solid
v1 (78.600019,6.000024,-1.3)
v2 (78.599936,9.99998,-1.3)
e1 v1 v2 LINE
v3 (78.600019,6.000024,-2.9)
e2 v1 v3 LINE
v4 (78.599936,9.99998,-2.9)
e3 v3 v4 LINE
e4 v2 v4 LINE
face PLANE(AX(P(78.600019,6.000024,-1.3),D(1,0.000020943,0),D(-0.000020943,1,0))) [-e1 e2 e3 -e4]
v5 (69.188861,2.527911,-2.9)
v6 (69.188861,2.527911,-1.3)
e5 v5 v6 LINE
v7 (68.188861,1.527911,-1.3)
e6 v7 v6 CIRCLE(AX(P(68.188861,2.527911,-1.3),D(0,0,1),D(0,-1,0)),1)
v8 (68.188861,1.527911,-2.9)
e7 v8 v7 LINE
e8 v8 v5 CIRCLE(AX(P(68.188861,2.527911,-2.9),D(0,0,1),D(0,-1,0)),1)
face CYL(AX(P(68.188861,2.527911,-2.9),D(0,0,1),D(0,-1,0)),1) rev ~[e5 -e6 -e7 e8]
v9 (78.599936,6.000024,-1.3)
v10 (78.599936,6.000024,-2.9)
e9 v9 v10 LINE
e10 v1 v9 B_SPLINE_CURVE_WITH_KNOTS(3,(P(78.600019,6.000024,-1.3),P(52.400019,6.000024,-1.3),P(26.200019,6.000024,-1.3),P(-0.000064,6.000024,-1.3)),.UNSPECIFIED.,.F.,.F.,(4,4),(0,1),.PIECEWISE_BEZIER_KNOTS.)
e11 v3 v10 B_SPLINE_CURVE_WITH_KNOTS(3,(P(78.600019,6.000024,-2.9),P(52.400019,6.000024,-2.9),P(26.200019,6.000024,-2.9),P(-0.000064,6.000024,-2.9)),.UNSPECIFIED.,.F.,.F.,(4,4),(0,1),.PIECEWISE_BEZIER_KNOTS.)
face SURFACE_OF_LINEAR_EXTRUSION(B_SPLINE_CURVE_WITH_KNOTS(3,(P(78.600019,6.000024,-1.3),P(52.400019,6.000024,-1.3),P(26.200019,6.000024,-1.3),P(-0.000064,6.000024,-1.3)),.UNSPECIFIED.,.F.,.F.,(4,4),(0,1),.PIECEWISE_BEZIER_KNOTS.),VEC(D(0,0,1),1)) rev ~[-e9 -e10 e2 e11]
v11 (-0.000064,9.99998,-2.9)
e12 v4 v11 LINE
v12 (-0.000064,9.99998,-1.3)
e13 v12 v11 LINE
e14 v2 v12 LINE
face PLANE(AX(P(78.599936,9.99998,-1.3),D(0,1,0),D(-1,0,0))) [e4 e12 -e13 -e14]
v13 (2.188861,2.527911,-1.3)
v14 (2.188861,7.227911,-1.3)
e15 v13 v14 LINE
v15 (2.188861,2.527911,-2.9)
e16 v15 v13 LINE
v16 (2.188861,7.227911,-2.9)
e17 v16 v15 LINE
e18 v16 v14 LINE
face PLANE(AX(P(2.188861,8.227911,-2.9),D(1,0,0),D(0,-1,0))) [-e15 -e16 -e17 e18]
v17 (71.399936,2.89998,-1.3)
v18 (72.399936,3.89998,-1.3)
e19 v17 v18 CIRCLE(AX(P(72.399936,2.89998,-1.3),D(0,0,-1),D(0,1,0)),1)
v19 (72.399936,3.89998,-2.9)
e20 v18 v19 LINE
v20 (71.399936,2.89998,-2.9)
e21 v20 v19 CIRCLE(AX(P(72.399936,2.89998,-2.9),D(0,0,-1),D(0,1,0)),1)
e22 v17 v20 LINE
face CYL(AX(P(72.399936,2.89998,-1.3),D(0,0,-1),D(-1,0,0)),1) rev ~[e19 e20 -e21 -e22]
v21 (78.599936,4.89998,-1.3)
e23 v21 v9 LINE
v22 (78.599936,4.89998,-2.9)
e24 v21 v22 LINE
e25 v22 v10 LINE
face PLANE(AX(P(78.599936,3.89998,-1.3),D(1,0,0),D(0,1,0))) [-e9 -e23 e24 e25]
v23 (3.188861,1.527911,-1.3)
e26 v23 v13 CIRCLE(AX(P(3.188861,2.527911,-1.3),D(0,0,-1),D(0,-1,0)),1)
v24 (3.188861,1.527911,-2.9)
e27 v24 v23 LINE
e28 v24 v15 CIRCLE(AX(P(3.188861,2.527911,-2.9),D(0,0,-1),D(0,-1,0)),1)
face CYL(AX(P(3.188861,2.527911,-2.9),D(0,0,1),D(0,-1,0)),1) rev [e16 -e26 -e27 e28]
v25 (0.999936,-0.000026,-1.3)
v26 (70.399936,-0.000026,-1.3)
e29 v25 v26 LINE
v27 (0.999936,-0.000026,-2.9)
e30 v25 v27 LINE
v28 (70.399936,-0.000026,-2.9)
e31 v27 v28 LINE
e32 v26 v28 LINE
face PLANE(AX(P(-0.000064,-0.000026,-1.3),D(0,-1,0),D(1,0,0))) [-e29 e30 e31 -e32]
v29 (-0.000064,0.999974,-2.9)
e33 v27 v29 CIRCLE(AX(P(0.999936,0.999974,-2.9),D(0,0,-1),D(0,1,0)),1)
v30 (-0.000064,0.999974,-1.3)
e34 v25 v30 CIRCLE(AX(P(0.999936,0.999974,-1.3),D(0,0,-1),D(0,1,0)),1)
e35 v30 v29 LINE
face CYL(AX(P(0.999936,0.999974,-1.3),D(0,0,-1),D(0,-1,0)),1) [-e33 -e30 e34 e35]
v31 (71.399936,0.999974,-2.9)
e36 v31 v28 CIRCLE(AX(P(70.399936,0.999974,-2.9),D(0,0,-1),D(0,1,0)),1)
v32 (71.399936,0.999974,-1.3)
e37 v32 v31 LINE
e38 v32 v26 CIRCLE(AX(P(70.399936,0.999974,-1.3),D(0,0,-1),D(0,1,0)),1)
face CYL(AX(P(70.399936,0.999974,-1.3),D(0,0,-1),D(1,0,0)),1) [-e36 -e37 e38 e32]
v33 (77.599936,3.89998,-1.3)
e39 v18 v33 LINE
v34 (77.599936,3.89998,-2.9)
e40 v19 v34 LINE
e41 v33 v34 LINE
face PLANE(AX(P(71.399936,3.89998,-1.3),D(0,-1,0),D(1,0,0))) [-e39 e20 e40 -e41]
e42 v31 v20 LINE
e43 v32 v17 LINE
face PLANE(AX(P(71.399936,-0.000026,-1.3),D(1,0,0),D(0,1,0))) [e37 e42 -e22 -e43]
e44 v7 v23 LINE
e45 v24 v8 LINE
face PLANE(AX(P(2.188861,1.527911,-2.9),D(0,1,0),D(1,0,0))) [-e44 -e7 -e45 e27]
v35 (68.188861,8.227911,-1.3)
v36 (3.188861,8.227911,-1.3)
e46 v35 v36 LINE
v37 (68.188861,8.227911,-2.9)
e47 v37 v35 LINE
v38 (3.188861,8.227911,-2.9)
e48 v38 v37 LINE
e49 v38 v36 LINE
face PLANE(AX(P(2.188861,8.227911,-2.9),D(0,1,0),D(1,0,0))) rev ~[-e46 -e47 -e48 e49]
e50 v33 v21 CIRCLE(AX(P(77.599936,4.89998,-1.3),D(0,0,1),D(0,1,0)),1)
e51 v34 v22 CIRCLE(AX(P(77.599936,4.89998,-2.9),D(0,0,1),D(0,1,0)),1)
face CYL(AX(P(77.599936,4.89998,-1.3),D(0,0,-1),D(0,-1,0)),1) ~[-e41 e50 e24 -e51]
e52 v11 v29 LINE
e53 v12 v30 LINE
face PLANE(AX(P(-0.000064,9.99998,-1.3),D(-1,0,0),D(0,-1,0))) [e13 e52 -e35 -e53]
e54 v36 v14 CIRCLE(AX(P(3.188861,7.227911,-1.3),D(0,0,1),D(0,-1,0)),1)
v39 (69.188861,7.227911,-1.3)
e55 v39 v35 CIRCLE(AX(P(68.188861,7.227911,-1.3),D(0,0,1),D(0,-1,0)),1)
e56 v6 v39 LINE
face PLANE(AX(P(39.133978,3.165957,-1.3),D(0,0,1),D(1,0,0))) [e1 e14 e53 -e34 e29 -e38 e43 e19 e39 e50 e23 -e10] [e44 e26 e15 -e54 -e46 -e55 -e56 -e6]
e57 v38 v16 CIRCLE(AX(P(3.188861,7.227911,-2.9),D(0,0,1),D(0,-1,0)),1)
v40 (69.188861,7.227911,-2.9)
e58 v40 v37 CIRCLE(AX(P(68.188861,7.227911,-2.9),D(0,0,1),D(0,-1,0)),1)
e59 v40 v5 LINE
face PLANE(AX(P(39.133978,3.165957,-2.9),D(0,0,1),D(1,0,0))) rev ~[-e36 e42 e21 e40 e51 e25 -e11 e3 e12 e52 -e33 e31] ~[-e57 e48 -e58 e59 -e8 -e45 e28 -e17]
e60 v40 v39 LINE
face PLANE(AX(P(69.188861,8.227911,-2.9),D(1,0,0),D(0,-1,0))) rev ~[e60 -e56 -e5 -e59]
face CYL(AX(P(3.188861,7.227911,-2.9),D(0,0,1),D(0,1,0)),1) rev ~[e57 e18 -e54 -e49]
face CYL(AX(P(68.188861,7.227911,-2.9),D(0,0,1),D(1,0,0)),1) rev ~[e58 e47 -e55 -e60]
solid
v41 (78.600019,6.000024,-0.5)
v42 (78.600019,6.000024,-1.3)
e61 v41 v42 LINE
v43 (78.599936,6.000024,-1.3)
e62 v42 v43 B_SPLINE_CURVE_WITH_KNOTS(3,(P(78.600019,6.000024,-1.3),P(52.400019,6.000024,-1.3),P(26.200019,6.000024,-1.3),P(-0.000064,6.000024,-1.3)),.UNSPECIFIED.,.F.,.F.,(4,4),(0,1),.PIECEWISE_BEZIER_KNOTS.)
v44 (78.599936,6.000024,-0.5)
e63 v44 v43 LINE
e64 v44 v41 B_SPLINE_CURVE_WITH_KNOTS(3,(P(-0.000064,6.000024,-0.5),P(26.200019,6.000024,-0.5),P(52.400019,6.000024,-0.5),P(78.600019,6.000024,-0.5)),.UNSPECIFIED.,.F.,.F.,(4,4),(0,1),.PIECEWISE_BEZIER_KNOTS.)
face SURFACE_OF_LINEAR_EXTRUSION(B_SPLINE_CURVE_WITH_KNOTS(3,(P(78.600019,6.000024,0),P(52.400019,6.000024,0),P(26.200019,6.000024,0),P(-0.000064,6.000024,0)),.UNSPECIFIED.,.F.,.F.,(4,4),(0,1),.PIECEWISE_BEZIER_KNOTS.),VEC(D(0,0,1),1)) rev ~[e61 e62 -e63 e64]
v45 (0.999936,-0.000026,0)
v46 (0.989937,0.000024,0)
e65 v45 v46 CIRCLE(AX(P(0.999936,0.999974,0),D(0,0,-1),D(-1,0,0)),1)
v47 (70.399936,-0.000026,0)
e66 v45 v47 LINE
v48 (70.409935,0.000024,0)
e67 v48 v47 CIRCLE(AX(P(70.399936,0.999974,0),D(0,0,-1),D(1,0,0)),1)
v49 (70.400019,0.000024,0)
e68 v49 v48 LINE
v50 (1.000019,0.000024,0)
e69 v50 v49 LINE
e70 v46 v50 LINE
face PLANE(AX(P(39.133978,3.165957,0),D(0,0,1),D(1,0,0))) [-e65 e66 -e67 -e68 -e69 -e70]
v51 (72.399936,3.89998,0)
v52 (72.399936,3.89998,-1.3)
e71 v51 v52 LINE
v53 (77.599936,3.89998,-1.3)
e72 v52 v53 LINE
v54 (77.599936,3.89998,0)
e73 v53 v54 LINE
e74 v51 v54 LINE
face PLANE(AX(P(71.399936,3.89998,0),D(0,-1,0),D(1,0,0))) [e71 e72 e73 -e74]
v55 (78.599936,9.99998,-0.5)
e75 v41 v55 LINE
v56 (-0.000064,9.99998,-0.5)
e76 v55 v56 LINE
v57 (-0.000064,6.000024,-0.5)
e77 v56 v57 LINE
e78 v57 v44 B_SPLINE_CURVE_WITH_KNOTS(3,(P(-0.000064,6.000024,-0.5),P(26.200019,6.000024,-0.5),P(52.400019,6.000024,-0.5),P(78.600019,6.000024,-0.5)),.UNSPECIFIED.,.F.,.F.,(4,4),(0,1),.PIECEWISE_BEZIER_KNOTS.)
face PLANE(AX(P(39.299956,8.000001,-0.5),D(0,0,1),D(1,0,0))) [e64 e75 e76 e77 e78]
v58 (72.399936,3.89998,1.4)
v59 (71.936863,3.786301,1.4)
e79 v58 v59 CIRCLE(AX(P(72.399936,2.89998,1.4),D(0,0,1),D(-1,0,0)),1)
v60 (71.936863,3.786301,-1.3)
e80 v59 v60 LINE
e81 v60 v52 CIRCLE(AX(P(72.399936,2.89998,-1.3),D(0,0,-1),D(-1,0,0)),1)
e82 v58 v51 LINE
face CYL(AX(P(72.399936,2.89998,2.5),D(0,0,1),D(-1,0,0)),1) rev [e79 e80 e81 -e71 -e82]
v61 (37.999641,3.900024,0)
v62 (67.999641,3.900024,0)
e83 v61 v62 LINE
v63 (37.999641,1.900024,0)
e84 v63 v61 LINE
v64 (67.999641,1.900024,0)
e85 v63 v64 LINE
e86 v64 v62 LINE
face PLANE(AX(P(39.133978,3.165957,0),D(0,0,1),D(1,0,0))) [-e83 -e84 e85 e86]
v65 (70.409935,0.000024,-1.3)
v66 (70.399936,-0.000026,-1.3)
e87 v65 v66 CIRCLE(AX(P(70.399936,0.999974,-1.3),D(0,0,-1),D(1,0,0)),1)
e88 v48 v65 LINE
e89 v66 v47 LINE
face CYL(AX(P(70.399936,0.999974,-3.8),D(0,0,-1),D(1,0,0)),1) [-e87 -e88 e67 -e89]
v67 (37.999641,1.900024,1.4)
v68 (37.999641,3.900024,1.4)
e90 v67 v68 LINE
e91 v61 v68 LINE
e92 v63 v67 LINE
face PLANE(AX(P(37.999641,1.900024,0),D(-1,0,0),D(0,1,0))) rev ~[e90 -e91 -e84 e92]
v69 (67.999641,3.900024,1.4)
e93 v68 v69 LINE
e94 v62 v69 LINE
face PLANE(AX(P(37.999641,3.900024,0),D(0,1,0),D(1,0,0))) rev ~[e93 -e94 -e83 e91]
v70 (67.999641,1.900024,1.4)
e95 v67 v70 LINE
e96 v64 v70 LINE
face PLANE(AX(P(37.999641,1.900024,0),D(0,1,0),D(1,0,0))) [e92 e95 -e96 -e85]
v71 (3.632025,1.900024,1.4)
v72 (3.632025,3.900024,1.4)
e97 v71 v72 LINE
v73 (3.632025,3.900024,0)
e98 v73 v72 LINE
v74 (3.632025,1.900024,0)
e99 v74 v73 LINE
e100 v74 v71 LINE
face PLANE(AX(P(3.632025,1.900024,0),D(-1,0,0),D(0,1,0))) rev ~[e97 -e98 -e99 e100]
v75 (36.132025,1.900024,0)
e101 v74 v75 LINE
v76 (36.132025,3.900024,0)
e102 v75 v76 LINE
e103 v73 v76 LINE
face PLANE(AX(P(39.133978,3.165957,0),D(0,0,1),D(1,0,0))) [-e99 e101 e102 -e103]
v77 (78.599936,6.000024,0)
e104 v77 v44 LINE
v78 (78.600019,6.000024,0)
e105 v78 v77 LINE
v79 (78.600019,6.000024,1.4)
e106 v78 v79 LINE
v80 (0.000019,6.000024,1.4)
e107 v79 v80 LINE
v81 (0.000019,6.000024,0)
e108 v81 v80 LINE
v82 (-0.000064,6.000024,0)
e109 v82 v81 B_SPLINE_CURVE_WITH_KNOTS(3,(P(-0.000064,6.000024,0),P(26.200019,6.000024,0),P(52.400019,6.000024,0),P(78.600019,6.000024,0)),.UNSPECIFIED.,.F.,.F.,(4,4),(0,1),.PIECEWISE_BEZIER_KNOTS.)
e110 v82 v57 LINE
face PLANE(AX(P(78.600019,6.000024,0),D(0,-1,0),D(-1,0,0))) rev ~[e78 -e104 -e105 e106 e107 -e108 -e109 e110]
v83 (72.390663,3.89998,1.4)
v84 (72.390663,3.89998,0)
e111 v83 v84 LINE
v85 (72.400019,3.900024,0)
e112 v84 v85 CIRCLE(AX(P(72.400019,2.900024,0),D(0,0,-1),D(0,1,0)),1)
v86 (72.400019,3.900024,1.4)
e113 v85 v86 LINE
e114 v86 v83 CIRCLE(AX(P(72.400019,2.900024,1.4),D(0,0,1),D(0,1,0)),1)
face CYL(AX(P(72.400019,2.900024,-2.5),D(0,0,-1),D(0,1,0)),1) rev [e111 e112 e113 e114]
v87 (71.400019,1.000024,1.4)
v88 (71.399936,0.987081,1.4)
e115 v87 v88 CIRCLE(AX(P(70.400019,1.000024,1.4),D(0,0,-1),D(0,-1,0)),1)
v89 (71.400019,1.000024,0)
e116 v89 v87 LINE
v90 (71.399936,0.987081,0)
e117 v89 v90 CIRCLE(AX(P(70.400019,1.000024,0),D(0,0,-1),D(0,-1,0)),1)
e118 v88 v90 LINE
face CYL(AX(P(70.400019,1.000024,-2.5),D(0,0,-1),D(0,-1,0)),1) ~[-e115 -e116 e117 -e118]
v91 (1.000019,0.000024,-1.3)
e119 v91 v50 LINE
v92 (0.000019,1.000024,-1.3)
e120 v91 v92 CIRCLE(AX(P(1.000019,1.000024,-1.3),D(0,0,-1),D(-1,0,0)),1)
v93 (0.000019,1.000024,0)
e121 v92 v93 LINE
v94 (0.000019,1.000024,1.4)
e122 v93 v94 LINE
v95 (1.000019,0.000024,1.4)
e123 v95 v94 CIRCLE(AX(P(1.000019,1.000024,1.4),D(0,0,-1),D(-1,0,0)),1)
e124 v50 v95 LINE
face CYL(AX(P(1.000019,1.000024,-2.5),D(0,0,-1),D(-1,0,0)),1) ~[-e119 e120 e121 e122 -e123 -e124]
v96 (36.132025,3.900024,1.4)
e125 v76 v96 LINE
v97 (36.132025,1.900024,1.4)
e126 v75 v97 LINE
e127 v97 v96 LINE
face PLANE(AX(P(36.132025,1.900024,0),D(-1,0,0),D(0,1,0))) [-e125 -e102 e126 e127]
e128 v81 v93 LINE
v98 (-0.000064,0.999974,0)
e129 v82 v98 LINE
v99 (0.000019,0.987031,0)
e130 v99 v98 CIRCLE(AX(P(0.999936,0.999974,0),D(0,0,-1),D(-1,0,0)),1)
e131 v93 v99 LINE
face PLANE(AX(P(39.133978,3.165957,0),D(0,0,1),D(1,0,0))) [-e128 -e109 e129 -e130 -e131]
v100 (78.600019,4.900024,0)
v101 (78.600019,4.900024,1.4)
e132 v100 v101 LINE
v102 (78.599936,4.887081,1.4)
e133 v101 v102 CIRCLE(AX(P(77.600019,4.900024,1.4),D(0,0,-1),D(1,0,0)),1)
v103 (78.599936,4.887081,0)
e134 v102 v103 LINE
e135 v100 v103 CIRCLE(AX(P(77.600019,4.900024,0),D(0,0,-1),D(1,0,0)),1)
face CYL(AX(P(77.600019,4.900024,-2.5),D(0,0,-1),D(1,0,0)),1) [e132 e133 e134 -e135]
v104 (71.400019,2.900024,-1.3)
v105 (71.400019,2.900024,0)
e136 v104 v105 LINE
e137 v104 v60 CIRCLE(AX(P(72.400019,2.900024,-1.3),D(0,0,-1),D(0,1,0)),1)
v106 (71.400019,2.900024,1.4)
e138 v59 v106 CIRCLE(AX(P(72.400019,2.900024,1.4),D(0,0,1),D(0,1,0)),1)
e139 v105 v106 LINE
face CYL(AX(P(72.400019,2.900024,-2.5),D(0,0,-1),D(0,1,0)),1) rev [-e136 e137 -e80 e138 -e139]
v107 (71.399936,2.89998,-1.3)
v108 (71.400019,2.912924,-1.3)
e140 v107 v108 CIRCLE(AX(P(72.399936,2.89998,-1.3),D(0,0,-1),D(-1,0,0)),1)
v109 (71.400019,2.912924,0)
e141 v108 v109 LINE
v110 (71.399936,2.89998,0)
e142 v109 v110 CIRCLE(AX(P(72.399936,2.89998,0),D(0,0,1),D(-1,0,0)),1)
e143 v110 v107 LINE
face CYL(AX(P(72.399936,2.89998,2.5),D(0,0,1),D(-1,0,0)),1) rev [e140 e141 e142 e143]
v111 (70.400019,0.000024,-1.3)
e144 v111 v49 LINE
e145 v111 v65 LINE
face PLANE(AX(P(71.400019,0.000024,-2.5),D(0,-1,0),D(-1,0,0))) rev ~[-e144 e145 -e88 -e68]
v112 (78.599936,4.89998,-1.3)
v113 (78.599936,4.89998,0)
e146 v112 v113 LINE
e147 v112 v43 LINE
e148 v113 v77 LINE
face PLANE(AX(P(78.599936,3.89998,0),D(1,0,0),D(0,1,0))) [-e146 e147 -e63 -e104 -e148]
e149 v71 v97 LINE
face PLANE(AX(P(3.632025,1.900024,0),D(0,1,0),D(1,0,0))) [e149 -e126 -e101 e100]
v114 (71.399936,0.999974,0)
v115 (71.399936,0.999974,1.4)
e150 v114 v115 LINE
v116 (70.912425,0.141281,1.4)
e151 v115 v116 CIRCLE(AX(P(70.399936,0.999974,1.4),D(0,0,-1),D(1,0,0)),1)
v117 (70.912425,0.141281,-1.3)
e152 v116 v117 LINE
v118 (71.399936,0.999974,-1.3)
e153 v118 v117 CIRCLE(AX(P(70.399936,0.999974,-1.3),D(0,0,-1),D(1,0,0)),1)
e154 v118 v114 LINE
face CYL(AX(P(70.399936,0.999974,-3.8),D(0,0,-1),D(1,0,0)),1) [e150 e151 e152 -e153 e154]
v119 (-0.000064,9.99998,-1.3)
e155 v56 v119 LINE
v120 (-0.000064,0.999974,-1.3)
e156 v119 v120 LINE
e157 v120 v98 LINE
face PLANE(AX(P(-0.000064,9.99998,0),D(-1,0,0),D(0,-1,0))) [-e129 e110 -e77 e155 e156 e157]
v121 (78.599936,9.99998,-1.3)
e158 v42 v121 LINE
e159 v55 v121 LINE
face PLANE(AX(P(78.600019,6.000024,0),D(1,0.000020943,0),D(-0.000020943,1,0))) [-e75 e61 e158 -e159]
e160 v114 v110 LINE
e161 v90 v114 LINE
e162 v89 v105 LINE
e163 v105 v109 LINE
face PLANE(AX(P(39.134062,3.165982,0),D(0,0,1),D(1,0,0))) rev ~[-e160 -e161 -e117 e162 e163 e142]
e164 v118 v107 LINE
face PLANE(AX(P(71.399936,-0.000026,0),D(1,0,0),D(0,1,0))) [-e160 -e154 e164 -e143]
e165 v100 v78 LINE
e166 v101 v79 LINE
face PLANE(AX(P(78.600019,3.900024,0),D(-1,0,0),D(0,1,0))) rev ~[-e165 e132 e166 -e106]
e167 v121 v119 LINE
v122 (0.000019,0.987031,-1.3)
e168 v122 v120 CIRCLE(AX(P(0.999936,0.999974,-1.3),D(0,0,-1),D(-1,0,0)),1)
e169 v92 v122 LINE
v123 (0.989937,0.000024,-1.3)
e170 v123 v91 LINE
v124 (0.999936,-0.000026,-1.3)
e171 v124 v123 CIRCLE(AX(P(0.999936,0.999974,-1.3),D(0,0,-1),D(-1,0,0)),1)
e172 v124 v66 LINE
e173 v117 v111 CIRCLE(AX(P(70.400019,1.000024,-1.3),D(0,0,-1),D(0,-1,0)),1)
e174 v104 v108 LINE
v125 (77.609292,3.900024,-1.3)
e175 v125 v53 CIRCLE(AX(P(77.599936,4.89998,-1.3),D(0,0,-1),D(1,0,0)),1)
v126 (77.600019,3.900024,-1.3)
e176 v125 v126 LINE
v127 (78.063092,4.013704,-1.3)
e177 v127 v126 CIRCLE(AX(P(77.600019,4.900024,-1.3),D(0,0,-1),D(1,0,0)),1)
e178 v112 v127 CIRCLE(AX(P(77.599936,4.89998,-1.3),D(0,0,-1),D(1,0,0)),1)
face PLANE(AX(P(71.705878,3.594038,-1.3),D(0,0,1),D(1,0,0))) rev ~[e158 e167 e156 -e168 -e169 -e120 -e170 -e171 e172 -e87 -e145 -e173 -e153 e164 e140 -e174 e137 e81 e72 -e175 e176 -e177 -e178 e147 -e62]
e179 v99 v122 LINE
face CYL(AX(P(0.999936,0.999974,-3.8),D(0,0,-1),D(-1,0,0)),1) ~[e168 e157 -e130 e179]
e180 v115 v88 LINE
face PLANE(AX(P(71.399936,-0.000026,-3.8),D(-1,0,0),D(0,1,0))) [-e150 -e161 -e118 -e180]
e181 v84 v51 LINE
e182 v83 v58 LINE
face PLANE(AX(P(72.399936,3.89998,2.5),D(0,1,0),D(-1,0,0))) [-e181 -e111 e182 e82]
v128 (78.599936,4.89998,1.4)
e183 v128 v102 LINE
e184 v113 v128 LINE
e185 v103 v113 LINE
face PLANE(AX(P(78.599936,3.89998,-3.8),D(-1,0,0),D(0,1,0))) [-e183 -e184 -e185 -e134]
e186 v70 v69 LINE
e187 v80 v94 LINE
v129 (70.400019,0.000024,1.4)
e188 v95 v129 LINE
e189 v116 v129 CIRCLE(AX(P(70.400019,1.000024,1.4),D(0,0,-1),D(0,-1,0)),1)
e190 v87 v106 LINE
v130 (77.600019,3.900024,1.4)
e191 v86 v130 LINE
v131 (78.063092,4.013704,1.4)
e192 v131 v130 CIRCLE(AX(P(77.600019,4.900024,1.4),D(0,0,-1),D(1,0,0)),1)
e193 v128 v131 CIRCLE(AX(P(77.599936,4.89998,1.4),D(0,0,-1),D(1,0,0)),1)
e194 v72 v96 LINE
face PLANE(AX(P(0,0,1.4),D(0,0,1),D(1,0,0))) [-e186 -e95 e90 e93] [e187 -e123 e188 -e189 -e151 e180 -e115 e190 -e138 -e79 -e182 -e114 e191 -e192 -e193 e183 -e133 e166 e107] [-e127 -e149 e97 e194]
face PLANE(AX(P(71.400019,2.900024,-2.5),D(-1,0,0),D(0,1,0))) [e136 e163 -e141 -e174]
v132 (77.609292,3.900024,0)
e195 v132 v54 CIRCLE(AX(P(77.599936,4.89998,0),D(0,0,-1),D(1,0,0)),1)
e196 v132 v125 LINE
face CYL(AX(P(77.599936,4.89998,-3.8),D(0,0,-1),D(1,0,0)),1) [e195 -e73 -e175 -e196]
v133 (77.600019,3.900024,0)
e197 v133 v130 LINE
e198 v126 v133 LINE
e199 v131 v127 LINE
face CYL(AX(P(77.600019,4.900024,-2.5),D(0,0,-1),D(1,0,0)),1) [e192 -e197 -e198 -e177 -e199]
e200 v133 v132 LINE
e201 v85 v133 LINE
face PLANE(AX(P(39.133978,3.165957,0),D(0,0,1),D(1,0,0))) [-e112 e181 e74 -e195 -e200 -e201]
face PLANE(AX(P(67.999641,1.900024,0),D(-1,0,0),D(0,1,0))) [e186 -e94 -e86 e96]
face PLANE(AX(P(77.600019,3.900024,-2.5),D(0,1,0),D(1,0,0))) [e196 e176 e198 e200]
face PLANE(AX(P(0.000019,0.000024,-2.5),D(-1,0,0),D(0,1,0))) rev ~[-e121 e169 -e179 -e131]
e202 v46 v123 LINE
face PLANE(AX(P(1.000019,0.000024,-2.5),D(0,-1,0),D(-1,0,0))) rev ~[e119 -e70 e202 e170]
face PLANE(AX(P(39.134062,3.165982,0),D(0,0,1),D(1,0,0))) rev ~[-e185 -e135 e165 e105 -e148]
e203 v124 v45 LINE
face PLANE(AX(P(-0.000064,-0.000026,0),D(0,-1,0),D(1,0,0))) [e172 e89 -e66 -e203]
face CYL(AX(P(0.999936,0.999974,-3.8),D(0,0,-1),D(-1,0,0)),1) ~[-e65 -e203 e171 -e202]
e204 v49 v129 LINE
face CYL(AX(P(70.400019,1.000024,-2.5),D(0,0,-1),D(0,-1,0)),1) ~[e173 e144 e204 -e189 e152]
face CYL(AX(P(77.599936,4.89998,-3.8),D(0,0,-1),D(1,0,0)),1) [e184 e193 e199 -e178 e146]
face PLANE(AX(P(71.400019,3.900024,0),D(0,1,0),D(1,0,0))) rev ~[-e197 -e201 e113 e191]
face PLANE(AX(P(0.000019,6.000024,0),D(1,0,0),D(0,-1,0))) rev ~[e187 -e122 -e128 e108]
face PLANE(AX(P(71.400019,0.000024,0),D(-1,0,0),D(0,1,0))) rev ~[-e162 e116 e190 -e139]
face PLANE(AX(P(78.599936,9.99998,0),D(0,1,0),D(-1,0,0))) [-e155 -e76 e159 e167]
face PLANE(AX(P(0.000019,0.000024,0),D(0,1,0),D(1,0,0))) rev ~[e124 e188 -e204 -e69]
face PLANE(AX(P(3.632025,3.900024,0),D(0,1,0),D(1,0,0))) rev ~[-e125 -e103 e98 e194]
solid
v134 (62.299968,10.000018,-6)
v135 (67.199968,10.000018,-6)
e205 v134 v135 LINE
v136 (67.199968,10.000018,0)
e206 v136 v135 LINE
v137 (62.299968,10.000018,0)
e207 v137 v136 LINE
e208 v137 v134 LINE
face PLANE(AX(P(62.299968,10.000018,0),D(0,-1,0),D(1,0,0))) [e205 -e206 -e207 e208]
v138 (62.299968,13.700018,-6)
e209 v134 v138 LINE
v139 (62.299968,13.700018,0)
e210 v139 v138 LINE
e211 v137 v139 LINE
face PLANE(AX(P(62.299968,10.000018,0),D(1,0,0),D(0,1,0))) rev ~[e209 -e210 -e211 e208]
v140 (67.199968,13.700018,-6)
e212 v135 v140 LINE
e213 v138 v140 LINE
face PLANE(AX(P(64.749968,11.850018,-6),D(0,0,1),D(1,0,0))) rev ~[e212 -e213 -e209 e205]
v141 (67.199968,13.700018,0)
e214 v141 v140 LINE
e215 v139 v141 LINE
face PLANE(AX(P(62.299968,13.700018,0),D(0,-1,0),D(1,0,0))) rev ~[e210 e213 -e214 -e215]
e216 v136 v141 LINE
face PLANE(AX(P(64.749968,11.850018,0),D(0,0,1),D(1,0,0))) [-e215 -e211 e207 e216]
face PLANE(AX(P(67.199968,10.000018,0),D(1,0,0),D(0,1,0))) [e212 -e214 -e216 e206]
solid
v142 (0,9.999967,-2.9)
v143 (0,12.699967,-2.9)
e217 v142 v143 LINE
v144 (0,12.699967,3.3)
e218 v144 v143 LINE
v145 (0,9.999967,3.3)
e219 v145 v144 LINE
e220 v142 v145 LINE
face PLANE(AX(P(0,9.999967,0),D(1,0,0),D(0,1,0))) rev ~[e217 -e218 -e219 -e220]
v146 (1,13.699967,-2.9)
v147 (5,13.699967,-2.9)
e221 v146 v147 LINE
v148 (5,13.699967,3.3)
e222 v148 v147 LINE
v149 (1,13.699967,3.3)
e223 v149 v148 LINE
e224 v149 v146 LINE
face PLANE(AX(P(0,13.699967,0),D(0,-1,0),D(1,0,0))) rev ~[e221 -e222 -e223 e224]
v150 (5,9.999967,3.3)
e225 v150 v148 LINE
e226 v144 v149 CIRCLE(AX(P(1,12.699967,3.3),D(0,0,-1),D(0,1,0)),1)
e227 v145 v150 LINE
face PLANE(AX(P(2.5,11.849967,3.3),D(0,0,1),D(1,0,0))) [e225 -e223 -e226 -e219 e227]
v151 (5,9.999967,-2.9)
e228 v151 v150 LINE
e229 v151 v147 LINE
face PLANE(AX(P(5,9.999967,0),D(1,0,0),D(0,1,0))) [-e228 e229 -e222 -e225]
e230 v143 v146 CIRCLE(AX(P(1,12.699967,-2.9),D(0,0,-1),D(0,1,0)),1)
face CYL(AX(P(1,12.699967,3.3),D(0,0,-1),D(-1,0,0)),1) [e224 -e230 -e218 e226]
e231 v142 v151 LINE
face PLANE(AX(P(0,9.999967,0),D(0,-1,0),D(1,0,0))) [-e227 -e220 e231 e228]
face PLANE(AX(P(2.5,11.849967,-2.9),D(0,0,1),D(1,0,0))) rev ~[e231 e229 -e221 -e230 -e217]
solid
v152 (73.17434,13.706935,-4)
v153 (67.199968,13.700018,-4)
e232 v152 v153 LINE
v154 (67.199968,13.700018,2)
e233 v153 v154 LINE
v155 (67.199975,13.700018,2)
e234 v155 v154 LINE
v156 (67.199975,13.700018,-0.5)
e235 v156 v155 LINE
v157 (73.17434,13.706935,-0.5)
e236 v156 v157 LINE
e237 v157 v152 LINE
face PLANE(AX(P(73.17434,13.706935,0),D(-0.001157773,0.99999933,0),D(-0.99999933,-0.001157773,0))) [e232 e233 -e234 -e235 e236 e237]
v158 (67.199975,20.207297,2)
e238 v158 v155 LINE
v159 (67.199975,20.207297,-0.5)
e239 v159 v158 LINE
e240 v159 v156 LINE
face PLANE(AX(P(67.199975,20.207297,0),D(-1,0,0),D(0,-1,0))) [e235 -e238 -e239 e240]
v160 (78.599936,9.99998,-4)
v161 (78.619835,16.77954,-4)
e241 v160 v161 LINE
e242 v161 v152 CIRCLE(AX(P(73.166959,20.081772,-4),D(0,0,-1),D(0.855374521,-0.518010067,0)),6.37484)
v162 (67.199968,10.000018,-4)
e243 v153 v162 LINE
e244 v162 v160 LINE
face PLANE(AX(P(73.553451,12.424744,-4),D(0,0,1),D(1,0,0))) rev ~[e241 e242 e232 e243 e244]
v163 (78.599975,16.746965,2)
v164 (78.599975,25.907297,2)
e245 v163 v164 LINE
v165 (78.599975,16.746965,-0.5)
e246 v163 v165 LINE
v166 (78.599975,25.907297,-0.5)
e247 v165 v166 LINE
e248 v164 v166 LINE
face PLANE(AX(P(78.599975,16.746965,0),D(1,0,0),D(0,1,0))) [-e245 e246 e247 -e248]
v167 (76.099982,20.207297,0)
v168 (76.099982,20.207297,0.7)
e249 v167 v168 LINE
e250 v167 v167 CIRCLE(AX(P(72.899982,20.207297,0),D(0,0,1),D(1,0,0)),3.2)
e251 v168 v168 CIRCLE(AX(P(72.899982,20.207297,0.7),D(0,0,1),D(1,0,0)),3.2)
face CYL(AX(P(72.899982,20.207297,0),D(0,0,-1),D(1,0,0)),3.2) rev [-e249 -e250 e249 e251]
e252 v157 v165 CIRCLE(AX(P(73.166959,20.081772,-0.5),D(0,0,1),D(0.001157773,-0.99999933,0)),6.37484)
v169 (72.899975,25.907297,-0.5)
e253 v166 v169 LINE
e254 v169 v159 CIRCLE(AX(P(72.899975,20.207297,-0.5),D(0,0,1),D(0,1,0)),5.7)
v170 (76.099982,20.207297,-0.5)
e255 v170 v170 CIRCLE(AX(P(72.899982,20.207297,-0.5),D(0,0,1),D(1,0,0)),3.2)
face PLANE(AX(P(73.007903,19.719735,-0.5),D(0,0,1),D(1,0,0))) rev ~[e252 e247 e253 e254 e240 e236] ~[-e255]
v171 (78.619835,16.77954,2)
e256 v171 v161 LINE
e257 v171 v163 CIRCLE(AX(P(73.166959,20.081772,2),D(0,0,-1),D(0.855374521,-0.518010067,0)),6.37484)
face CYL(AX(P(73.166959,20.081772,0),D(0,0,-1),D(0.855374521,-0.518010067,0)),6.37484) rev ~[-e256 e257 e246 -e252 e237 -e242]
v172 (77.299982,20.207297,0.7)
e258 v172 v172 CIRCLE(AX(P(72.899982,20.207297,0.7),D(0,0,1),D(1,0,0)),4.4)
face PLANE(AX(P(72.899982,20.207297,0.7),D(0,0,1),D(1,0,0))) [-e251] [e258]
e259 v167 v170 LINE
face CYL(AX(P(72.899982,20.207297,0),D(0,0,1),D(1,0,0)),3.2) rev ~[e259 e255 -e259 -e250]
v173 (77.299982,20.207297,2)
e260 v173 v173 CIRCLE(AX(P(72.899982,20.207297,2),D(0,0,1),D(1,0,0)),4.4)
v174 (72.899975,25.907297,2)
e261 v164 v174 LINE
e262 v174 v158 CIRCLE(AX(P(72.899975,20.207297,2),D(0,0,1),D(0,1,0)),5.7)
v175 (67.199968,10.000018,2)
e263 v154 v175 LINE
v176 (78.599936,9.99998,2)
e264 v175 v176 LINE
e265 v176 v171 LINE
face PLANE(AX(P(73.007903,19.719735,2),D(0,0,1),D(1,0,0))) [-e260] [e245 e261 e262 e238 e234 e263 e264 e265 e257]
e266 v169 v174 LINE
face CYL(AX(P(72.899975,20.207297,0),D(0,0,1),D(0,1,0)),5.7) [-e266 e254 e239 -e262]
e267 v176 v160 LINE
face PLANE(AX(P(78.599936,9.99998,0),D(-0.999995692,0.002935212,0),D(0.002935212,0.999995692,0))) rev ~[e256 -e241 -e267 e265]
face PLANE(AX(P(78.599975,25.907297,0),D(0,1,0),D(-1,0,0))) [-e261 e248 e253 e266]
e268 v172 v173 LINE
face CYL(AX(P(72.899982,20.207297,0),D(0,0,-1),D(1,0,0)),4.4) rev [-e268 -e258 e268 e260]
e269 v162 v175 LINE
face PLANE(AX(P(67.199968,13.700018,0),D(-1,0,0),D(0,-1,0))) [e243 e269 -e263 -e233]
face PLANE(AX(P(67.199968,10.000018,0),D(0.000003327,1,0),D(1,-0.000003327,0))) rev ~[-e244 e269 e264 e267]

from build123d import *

# Parameters (mm, degrees)
F0_W           = 32.5
F0_H           = 2
F0_W_2         = 30
F1_DEPTH       = 1.4
F3_DEPTH       = 1.3
F4_DEPTH       = 1.6
F5_W           = 67
F5_H           = 6.7
F6_DEPTH       = 4.301
F9_T4_DEPTH    = 3.9
F9_T9_DEPTH    = 3.8
F9_T11_DEPTH   = 6.3
F9_T13_DEPTH   = 6.4
F9_2_F1_R      = 1
F9_2_F2_R      = 1
F11_DEPTH      = 4
F12_R          = 4.4
F13_DEPTH      = 2
F12_R_2        = 3.2
F14_DEPTH      = 0.7
F15_DEPTH      = 0.5
F7_W           = 5
F7_H           = 3.7
F16_DEPTH      = 3.3
F16_DEPTH_BACK = 2.9
F8_W           = 4.9
F8_H           = 3.7
F17_DEPTH      = 6
F19_DEPTH      = 0.5
F20_R          = 1


# Not quite as in the source:
# - a fillet or chamfer that OpenCascade refuses, or shapes differently, is made with other operations: its cross-section is extruded or revolved along the edge and cut away or added
# - ends of sketch curves that miss each other by under 0.0002 mm in the source are joined


with BuildPart() as f1:
    # F0 (on Top) → F1 (new body)
    with BuildSketch(Plane.XY):
        Polygon((78.6000193149, 6.0000242492), (1.93149e-05, 6.0000242492), (1.93149e-05, 2.42492e-05), (71.4000193149, 2.42492e-05), (71.4000193149, 3.9000242492), (78.6000193149, 3.9000242492), align=None)
        with Locations((19.8820251949, 2.9000242492)):
            Rectangle(F0_W, F0_H, mode=Mode.SUBTRACT)
        with Locations((52.9996412504, 2.9000242492)):
            Rectangle(F0_W_2, F0_H, mode=Mode.SUBTRACT)
    extrude(amount=F1_DEPTH)

    # F2 (on Top) → F3 (join)
    with BuildSketch(Plane.XY):
        with BuildLine():
            Line((-6.4456e-05, 6.0000242492), (-6.4456e-05, -2.57419e-05))
            Line((-6.4456e-05, -2.57419e-05), (71.399935544, -2.57419e-05))
            Line((71.399935544, -2.57419e-05), (71.399935544, 3.8999804767))
            Line((71.399935544, 3.8999804767), (78.599935544, 3.8999804767))
            Line((78.599935544, 3.8999804767), (78.599935544, 6.0000242492))
            add(Edge.make_bspline(
                [(78.599935544, 6.0000242492), (52.4000193149, 6.0000242492), (26.2000193149, 6.0000242492), (-6.4456e-05, 6.0000242492)],
                knots=[0, 0, 0, 0, 1, 1, 1, 1], degree=3))
        make_face()
        with BuildLine():
            Line((-6.4456e-05, 9.9999804767), (-6.4456e-05, 6.0000242492))
            add(Edge.make_bspline(
                [(78.6000193149, 6.0000242492), (52.4000193149, 6.0000242492), (26.2000193149, 6.0000242492), (-6.4456e-05, 6.0000242492)],
                knots=[0, 0, 0, 0, 1, 1, 1, 1], degree=3))
            Line((78.6000193149, 6.0000242492), (78.599935544, 9.9999804767))
            Line((78.599935544, 9.9999804767), (-6.4456e-05, 9.9999804767))
        make_face()
    extrude(amount=-F3_DEPTH)


with BuildPart() as f4:
    # F4 (new): a face of the model
    f4_faces = [f1.part.faces().sort_by_distance(p)[0] for p in [
        (37.9773022777, 5.1129767056, -1.3),
    ]]
    extrude(f4_faces, amount=F4_DEPTH)

    # F5 (on face) → F6 (cut, through all)
    with BuildSketch(Plane(origin=(0, 0, -2.9), x_dir=(1, 0, 0), z_dir=(0, 0, -1))):
        with Locations((35.6888609044, -4.8779113121)):
            Rectangle(F5_W, F5_H)
    extrude(amount=-F6_DEPTH, mode=Mode.SUBTRACT)

    # F9#2: fillet of radius 1 on 8 edges, made by hand

    # F9_2_f1
    f9_2_f1_edges = [f4.edges().sort_by_distance(p)[0] for p in [
        (71.399935544, 3.8999804767, -2.1),
        (69.1888609044, 8.2279113121, -2.1),
        (69.1888609044, 1.5279113121, -2.1),
        (2.1888609044, 8.2279113121, -2.1),
        (2.1888609044, 1.5279113121, -2.1),
    ]]
    fillet(f9_2_f1_edges, radius=F9_2_F1_R)

    # F9_2_f2
    f9_2_f2_edges = [f4.edges().sort_by_distance(p)[0] for p in [
        (71.399935544, -2.57419e-05, -2.1),
        (78.599935544, 3.8999804767, -2.1),
        (-6.4456e-05, -2.57419e-05, -2.1),
    ]]
    fillet(f9_2_f2_edges, radius=F9_2_F2_R)


with BuildPart() as f1_1:
    add(f1.part)

    # F9: fillet of radius 1 on 8 edges, made by hand


with BuildPart() as f9_tool2:
    # F9_s3 → F9_t4 (new body)
    with BuildSketch(Plane.XY.offset(-2.5)):
        with BuildLine():
            ThreePointArc((72.4000193149, 3.9000242492), (71.6929125337, 3.6071310304), (71.4000193149, 2.9000242492))
            Line((71.4000193149, 2.9000242492), (71.4000193149, 3.9000242492))
            Line((71.4000193149, 3.9000242492), (72.4000193149, 3.9000242492))
        make_face()
    extrude(amount=F9_T4_DEPTH)

    split(bisect_by=Plane.XY.offset(-1.3), keep=Keep.TOP)


with BuildPart() as f1_2:
    add(f1_1.part)

    # F9_t1: union F9_tool2
    add(f9_tool2.part)


with BuildPart() as f9_tool7:
    # F9_s8 → F9_t9 (new body)
    with BuildSketch(Plane.XY.offset(2.5)):
        with BuildLine():
            ThreePointArc((71.399935544, 2.8999804767), (71.6928287629, 3.6070872579), (72.399935544, 3.8999804767))
            Line((72.399935544, 3.8999804767), (71.399935544, 3.8999804767))
            Line((71.399935544, 3.8999804767), (71.399935544, 2.8999804767))
        make_face()
    extrude(amount=-F9_T9_DEPTH)

    split(bisect_by=Plane.XY.offset(1.4), keep=Keep.BOTTOM)


with BuildPart() as f1_3:
    add(f1_2.part)

    # F9_t6: union F9_tool7
    add(f9_tool7.part)

    # F9_s12 → F9_t11 (cut)
    with BuildSketch(Plane.XY.offset(-3.8)):
        with BuildLine():
            ThreePointArc((71.399935544, 0.9999742581), (71.1070423252, 0.292867477), (70.399935544, -2.57419e-05))
            Line((70.399935544, -2.57419e-05), (71.399935544, -2.57419e-05))
            Line((71.399935544, -2.57419e-05), (71.399935544, 0.9999742581))
        make_face()
        with BuildLine():
            ThreePointArc((78.599935544, 4.8999804767), (78.3070423252, 4.1928736955), (77.599935544, 3.8999804767))
            Line((77.599935544, 3.8999804767), (78.599935544, 3.8999804767))
            Line((78.599935544, 3.8999804767), (78.599935544, 4.8999804767))
        make_face()
        with BuildLine():
            ThreePointArc((-6.4456e-05, 0.9999742581), (0.2928287629, 0.292867477), (0.999935544, -2.57419e-05))
            Line((0.999935544, -2.57419e-05), (-6.4456e-05, -2.57419e-05))
            Line((-6.4456e-05, -2.57419e-05), (-6.4456e-05, 0.9999742581))
        make_face()
    extrude(amount=F9_T11_DEPTH, mode=Mode.SUBTRACT)

    # F9_s14 → F9_t13 (cut)
    with BuildSketch(Plane.XY.offset(-2.5)):
        with BuildLine():
            ThreePointArc((70.4000193149, 2.42492e-05), (71.1071260961, 0.292917468), (71.4000193149, 1.0000242492))
            Line((71.4000193149, 1.0000242492), (71.4000193149, 2.42492e-05))
            Line((71.4000193149, 2.42492e-05), (70.4000193149, 2.42492e-05))
        make_face()
        with BuildLine():
            ThreePointArc((78.6000193149, 4.9000242492), (78.3071260961, 4.192917468), (77.6000193149, 3.9000242492))
            Line((77.6000193149, 3.9000242492), (78.6000193149, 3.9000242492))
            Line((78.6000193149, 3.9000242492), (78.6000193149, 4.9000242492))
        make_face()
        with BuildLine():
            ThreePointArc((1.93149e-05, 1.0000242492), (0.2929125337, 0.292917468), (1.0000193149, 2.42492e-05))
            Line((1.0000193149, 2.42492e-05), (1.93149e-05, 2.42492e-05))
            Line((1.93149e-05, 2.42492e-05), (1.93149e-05, 1.0000242492))
        make_face()
    extrude(amount=F9_T13_DEPTH, mode=Mode.SUBTRACT)

    # F18 (on face) → F19 (cut)
    with BuildSketch(Plane.XY):
        with BuildLine():
            Line((78.599935544, 9.9999804767), (-6.4456e-05, 9.9999804767))
            Line((-6.4456e-05, 9.9999804767), (-6.4456e-05, 6.0000242492))
            add(Edge.make_bspline(
                [(-6.4456e-05, 6.0000242492), (26.2000193149, 6.0000242492), (52.4000193149, 6.0000242492), (78.6000193149, 6.0000242492)],
                knots=[0, 0, 0, 0, 1, 1, 1, 1], degree=3))
            Line((78.6000193149, 6.0000242492), (78.599935544, 9.9999804767))
        make_face()
    extrude(amount=-F19_DEPTH, mode=Mode.SUBTRACT)


with BuildPart() as f11:
    # F10 (on Top) → F11 (new body)
    with BuildSketch(Plane.XY):
        with BuildLine():
            Line((78.599935544, 9.9999804767), (78.6198350713, 16.7795400161))
            ThreePointArc((78.6198350713, 16.7795400161), (76.299661596, 14.5297660466), (73.1743396044, 13.7069353726))
            Line((73.1743396044, 13.7069353726), (67.1999678016, 13.7000184029))
            Line((67.1999678016, 13.7000184029), (67.1999678016, 10.0000184029))
            Line((67.1999678016, 10.0000184029), (78.599935544, 9.9999804767))
        make_face()
    extrude(amount=-F11_DEPTH)

    # F12 (on Top) + F10 (on Top) → F13 (join)
    with BuildSketch(Plane.XY):
        with BuildLine():
            Line((78.5999745131, 25.9072966889), (72.8999745131, 25.9072966889))
            ThreePointArc((72.8999745131, 25.9072966889), (68.8694658603, 24.2378053416), (67.1999745131, 20.2072966889))
            Line((67.1999745131, 20.2072966889), (67.1999745131, 13.7000184029))
            Line((67.1999745131, 13.7000184029), (73.1743396044, 13.7069353726))
            ThreePointArc((73.1743396044, 13.7069353726), (76.2830339187, 14.5204167001), (78.5999745131, 16.7469652605))
            Line((78.5999745131, 16.7469652605), (78.5999745131, 25.9072966889))
        make_face()
        with Locations((72.8999819636, 20.2072966889)):
            Circle(F12_R, mode=Mode.SUBTRACT)
    with BuildSketch(Plane.XY):
        with BuildLine():
            Line((78.599935544, 9.9999804767), (78.6198350713, 16.7795400161))
            ThreePointArc((78.6198350713, 16.7795400161), (76.299661596, 14.5297660466), (73.1743396044, 13.7069353726))
            Line((73.1743396044, 13.7069353726), (67.1999678016, 13.7000184029))
            Line((67.1999678016, 13.7000184029), (67.1999678016, 10.0000184029))
            Line((67.1999678016, 10.0000184029), (78.599935544, 9.9999804767))
        make_face()
    extrude(amount=F13_DEPTH)

    # F12 (on Top) → F14 (join)
    with BuildSketch(Plane.XY):
        with Locations((72.8999819636, 20.2072966889)):
            Circle(F12_R)
        with Locations((72.8999819636, 20.2072966889)):
            Circle(F12_R_2, mode=Mode.SUBTRACT)
    extrude(amount=F14_DEPTH)

    # F12 (on Top) → F15 (join)
    with BuildSketch(Plane.XY):
        with BuildLine():
            Line((78.5999745131, 25.9072966889), (72.8999745131, 25.9072966889))
            ThreePointArc((72.8999745131, 25.9072966889), (68.8694658603, 24.2378053416), (67.1999745131, 20.2072966889))
            Line((67.1999745131, 20.2072966889), (67.1999745131, 13.7000184029))
            Line((67.1999745131, 13.7000184029), (73.1743396044, 13.7069353726))
            ThreePointArc((73.1743396044, 13.7069353726), (76.2830339187, 14.5204167001), (78.5999745131, 16.7469652605))
            Line((78.5999745131, 16.7469652605), (78.5999745131, 25.9072966889))
        make_face()
        with Locations((72.8999819636, 20.2072966889)):
            Circle(F12_R, mode=Mode.SUBTRACT)
        with Locations((72.8999819636, 20.2072966889)):
            Circle(F12_R)
        with Locations((72.8999819636, 20.2072966889)):
            Circle(F12_R_2, mode=Mode.SUBTRACT)
    extrude(amount=-F15_DEPTH)


with BuildPart() as f16:
    # F7 (on Top) → F16 (new body, two sides)
    with BuildSketch(Plane.XY) as f16_sk:
        with Locations((2.5, 11.8499671802)):
            Rectangle(F7_W, F7_H)
    extrude(amount=F16_DEPTH)
    extrude(f16_sk.sketch, amount=-F16_DEPTH_BACK)

    # F20
    f20_edges = [f16.edges().sort_by_distance(p)[0] for p in [
        (0, 13.699967, 0.2),
    ]]
    fillet(f20_edges, radius=F20_R)


with BuildPart() as f17:
    # F8 (on face) → F17 (new body)
    with BuildSketch(Plane.XY):
        with Locations((64.7499678016, 11.8500184029)):
            Rectangle(F8_W, F8_H)
    extrude(amount=-F17_DEPTH)


solid = Compound([f4.part, f1_3.part, f11.part, f16.part, f17.part])
